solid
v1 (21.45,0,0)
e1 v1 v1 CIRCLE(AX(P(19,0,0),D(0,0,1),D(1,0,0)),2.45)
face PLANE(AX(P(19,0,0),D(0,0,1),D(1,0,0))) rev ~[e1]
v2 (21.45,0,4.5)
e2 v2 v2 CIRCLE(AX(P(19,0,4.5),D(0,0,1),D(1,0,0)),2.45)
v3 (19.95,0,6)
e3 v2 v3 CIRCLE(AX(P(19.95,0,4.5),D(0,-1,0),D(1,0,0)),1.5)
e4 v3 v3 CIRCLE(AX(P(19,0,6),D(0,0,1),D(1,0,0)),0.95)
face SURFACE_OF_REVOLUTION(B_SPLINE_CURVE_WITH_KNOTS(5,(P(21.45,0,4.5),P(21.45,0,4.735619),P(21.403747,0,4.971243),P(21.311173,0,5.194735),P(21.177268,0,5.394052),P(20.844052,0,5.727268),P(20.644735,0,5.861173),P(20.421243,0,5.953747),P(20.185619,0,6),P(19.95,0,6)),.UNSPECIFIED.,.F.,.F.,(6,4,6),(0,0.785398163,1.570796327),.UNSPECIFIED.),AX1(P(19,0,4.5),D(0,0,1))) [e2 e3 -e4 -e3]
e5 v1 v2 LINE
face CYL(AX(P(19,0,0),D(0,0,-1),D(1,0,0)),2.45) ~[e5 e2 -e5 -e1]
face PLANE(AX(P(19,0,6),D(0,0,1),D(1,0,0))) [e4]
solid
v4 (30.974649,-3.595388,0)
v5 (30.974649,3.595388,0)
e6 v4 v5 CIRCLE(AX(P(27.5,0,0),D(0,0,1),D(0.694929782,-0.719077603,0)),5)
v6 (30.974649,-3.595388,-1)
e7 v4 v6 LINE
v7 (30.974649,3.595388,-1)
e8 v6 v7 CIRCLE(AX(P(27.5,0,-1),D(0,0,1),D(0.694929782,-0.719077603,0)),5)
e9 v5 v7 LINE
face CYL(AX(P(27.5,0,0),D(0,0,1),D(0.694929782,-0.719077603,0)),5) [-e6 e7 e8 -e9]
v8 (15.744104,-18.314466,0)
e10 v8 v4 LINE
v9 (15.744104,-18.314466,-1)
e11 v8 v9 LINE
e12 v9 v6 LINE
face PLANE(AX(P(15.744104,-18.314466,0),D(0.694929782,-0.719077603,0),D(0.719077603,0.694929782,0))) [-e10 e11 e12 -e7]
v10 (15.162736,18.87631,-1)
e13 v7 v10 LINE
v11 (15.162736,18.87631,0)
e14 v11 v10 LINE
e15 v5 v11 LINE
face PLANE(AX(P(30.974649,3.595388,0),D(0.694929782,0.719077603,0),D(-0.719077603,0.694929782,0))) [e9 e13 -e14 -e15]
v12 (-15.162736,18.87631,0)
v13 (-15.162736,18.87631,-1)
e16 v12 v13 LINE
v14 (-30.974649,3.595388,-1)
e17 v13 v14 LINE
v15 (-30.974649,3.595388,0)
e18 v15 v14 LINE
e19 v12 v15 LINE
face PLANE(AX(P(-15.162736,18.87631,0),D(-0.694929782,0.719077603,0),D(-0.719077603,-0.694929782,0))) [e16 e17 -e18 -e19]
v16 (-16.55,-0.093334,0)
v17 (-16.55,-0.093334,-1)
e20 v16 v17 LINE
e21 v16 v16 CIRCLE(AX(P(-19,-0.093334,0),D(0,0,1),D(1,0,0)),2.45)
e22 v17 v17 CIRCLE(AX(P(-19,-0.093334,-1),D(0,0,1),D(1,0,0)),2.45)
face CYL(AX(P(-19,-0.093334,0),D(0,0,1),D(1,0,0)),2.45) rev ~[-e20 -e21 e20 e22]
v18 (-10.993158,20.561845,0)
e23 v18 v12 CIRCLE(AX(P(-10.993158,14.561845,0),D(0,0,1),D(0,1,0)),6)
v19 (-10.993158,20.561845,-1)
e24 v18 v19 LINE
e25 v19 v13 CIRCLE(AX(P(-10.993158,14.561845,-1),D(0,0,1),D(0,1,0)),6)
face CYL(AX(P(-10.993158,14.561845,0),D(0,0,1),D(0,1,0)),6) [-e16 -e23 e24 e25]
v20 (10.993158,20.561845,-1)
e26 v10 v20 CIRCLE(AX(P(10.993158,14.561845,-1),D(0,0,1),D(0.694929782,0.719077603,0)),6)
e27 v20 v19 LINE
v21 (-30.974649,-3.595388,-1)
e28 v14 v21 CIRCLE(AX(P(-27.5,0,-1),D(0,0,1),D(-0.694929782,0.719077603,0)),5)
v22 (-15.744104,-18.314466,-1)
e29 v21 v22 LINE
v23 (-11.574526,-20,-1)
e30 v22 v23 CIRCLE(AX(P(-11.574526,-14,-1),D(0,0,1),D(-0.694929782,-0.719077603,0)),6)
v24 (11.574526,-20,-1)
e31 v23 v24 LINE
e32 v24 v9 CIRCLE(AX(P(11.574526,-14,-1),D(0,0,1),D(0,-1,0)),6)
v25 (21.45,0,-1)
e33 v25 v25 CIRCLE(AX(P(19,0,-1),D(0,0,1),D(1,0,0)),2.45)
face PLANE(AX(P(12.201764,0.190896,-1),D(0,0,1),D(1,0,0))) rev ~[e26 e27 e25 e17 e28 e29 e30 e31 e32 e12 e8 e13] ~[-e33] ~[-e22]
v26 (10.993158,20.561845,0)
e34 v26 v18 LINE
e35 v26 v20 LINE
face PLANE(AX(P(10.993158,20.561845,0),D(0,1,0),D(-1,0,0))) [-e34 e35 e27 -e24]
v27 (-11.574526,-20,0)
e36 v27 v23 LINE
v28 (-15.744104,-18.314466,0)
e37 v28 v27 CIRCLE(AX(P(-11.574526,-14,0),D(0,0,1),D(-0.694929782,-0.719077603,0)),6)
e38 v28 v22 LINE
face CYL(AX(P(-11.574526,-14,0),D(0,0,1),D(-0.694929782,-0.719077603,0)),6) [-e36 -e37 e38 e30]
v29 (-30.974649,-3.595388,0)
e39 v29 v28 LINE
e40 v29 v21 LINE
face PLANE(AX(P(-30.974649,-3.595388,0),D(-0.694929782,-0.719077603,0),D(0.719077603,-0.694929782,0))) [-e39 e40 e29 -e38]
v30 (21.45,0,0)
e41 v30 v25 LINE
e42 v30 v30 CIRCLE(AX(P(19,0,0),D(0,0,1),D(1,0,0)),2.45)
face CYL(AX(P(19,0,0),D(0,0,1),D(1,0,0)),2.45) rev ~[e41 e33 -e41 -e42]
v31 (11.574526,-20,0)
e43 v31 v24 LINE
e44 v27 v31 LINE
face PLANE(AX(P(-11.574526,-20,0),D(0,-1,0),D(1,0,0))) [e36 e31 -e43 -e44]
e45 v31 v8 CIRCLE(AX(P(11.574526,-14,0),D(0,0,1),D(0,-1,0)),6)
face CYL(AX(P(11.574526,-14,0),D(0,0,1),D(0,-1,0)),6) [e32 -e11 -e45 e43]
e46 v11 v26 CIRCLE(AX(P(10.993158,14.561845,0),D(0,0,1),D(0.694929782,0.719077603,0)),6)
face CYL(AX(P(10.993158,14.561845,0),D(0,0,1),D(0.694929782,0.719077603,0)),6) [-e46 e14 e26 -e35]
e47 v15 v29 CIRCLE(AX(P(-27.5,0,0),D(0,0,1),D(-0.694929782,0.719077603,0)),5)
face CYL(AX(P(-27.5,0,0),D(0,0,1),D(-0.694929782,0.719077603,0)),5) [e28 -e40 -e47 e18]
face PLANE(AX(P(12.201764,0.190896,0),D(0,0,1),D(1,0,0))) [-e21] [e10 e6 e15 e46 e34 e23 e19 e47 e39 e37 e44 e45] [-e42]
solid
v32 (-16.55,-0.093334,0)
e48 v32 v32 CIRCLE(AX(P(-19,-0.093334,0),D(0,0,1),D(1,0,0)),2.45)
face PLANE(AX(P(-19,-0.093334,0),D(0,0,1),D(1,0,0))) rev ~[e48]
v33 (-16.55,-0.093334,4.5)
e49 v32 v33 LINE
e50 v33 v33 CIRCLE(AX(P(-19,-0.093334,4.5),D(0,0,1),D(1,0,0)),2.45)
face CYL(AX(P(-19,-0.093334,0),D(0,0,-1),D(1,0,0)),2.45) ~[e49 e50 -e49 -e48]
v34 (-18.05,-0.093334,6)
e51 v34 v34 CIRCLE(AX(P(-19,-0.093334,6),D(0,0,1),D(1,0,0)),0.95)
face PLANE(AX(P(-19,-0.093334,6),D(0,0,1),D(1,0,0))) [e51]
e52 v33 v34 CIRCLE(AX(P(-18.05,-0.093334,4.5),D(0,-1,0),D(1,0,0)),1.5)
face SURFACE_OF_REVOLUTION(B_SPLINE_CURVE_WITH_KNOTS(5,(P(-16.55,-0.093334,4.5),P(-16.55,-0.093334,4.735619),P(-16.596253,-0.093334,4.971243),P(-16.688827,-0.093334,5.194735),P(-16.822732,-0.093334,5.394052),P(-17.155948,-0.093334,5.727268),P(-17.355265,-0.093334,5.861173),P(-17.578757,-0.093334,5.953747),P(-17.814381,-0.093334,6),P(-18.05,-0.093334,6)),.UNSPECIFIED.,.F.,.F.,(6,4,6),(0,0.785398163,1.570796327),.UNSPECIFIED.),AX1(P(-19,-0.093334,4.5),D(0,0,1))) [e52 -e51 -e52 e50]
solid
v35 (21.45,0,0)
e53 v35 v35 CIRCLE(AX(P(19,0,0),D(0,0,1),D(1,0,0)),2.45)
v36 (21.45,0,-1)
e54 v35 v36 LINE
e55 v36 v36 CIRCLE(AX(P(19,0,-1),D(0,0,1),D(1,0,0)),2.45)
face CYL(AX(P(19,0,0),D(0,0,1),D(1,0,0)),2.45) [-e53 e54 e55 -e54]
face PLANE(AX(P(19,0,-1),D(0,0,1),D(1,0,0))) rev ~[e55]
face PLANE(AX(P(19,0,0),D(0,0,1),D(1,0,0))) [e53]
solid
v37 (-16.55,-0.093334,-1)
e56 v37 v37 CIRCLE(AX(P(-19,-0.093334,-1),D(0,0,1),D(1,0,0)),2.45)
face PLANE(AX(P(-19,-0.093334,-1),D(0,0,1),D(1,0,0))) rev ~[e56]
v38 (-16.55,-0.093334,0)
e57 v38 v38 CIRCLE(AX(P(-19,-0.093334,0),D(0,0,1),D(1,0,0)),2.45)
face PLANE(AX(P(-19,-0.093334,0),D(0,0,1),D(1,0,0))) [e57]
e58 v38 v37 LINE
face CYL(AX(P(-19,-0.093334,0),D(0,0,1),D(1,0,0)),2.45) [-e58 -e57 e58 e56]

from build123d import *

# Parameters (mm, degrees)
F0_R     = 2.45
F1_DEPTH = 1
F2_DEPTH = 6
F3_R     = 1.5
F4_R     = 1.5
F5_DEPTH = 1


# Not quite as in the source:
# - a feature names something its author has since deleted; it is built from what else it names


with BuildPart() as f1:
    # F0 (on Top) → F1 (new body)
    with BuildSketch(Plane.XY):
        with BuildLine():
            Line((10.9931575138, 20.5618447948), (0, 20.5618447948))
            Line((0, 20.5618447948), (0, -20))
            Line((0, -20), (11.5745256156, -20))
            ThreePointArc((11.5745256156, -20), (13.8232148234, -19.5626789272), (15.7441043055, -18.3144656157))
            Line((15.7441043055, -18.3144656157), (30.9746489082, -3.5953880131))
            ThreePointArc((30.9746489082, -3.5953880131), (32.5, 0), (30.9746489082, 3.5953880131))
            Line((30.9746489082, 3.5953880131), (15.1627362037, 18.8763104104))
            ThreePointArc((15.1627362037, 18.8763104104), (13.2418467215, 20.124523722), (10.9931575138, 20.5618447948))
        make_face()
        with Locations((19, 0)):
            Circle(F0_R, mode=Mode.SUBTRACT)
        with BuildLine():
            Line((0, 20.5618447948), (-10.9931575138, 20.5618447948))
            ThreePointArc((-10.9931575138, 20.5618447948), (-13.2418467215, 20.124523722), (-15.1627362037, 18.8763104104))
            Line((-15.1627362037, 18.8763104104), (-30.9746489082, 3.5953880131))
            ThreePointArc((-30.9746489082, 3.5953880131), (-32.5, 0), (-30.9746489082, -3.5953880131))
            Line((-30.9746489082, -3.5953880131), (-15.7441043055, -18.3144656157))
            ThreePointArc((-15.7441043055, -18.3144656157), (-13.8232148234, -19.5626789272), (-11.5745256156, -20))
            Line((-11.5745256156, -20), (0, -20))
            Line((0, -20), (0, 20.5618447948))
        make_face()
        with Locations((-19, -0.0933343646)):
            Circle(F0_R, mode=Mode.SUBTRACT)
    extrude(amount=-F1_DEPTH)


with BuildPart() as f2:
    # F0 (on Top) → F2 (new body)
    with BuildSketch(Plane.XY):
        with Locations((-19, -0.0933343646)):
            Circle(F0_R)
    extrude(amount=F2_DEPTH)

    # F3
    f3_edges = [f2.edges().sort_by_distance(p)[0] for p in [
        (-21.45, -0.093334, 6),
    ]]
    fillet(f3_edges, radius=F3_R)


with BuildPart() as f2b:
    # F0 (on Top) → F2, piece 2 (new body)
    with BuildSketch(Plane.XY):
        with Locations((19, 0)):
            Circle(F0_R)
    extrude(amount=F2_DEPTH)

    # F4
    f4_edges = [f2b.edges().sort_by_distance(p)[0] for p in [
        (16.55, 0, 6),
    ]]
    fillet(f4_edges, radius=F4_R)


with BuildPart() as f5:
    # F5 (new): a face of the model
    f5_faces = [f2b.part.faces().sort_by_distance(p)[0] for p in [
        (19, 0, 0),
    ]]
    extrude(f5_faces, amount=F5_DEPTH)


with BuildPart() as f5b:
    # F5#2 (new): a face of the model
    f5_2_faces = [f2.part.faces().sort_by_distance(p)[0] for p in [
        (-19, -0.0933343646, 0),
    ]]
    extrude(f5_2_faces, amount=F5_DEPTH)


solid = Compound([f1.part, f2.part, f2b.part, f5.part, f5b.part])
